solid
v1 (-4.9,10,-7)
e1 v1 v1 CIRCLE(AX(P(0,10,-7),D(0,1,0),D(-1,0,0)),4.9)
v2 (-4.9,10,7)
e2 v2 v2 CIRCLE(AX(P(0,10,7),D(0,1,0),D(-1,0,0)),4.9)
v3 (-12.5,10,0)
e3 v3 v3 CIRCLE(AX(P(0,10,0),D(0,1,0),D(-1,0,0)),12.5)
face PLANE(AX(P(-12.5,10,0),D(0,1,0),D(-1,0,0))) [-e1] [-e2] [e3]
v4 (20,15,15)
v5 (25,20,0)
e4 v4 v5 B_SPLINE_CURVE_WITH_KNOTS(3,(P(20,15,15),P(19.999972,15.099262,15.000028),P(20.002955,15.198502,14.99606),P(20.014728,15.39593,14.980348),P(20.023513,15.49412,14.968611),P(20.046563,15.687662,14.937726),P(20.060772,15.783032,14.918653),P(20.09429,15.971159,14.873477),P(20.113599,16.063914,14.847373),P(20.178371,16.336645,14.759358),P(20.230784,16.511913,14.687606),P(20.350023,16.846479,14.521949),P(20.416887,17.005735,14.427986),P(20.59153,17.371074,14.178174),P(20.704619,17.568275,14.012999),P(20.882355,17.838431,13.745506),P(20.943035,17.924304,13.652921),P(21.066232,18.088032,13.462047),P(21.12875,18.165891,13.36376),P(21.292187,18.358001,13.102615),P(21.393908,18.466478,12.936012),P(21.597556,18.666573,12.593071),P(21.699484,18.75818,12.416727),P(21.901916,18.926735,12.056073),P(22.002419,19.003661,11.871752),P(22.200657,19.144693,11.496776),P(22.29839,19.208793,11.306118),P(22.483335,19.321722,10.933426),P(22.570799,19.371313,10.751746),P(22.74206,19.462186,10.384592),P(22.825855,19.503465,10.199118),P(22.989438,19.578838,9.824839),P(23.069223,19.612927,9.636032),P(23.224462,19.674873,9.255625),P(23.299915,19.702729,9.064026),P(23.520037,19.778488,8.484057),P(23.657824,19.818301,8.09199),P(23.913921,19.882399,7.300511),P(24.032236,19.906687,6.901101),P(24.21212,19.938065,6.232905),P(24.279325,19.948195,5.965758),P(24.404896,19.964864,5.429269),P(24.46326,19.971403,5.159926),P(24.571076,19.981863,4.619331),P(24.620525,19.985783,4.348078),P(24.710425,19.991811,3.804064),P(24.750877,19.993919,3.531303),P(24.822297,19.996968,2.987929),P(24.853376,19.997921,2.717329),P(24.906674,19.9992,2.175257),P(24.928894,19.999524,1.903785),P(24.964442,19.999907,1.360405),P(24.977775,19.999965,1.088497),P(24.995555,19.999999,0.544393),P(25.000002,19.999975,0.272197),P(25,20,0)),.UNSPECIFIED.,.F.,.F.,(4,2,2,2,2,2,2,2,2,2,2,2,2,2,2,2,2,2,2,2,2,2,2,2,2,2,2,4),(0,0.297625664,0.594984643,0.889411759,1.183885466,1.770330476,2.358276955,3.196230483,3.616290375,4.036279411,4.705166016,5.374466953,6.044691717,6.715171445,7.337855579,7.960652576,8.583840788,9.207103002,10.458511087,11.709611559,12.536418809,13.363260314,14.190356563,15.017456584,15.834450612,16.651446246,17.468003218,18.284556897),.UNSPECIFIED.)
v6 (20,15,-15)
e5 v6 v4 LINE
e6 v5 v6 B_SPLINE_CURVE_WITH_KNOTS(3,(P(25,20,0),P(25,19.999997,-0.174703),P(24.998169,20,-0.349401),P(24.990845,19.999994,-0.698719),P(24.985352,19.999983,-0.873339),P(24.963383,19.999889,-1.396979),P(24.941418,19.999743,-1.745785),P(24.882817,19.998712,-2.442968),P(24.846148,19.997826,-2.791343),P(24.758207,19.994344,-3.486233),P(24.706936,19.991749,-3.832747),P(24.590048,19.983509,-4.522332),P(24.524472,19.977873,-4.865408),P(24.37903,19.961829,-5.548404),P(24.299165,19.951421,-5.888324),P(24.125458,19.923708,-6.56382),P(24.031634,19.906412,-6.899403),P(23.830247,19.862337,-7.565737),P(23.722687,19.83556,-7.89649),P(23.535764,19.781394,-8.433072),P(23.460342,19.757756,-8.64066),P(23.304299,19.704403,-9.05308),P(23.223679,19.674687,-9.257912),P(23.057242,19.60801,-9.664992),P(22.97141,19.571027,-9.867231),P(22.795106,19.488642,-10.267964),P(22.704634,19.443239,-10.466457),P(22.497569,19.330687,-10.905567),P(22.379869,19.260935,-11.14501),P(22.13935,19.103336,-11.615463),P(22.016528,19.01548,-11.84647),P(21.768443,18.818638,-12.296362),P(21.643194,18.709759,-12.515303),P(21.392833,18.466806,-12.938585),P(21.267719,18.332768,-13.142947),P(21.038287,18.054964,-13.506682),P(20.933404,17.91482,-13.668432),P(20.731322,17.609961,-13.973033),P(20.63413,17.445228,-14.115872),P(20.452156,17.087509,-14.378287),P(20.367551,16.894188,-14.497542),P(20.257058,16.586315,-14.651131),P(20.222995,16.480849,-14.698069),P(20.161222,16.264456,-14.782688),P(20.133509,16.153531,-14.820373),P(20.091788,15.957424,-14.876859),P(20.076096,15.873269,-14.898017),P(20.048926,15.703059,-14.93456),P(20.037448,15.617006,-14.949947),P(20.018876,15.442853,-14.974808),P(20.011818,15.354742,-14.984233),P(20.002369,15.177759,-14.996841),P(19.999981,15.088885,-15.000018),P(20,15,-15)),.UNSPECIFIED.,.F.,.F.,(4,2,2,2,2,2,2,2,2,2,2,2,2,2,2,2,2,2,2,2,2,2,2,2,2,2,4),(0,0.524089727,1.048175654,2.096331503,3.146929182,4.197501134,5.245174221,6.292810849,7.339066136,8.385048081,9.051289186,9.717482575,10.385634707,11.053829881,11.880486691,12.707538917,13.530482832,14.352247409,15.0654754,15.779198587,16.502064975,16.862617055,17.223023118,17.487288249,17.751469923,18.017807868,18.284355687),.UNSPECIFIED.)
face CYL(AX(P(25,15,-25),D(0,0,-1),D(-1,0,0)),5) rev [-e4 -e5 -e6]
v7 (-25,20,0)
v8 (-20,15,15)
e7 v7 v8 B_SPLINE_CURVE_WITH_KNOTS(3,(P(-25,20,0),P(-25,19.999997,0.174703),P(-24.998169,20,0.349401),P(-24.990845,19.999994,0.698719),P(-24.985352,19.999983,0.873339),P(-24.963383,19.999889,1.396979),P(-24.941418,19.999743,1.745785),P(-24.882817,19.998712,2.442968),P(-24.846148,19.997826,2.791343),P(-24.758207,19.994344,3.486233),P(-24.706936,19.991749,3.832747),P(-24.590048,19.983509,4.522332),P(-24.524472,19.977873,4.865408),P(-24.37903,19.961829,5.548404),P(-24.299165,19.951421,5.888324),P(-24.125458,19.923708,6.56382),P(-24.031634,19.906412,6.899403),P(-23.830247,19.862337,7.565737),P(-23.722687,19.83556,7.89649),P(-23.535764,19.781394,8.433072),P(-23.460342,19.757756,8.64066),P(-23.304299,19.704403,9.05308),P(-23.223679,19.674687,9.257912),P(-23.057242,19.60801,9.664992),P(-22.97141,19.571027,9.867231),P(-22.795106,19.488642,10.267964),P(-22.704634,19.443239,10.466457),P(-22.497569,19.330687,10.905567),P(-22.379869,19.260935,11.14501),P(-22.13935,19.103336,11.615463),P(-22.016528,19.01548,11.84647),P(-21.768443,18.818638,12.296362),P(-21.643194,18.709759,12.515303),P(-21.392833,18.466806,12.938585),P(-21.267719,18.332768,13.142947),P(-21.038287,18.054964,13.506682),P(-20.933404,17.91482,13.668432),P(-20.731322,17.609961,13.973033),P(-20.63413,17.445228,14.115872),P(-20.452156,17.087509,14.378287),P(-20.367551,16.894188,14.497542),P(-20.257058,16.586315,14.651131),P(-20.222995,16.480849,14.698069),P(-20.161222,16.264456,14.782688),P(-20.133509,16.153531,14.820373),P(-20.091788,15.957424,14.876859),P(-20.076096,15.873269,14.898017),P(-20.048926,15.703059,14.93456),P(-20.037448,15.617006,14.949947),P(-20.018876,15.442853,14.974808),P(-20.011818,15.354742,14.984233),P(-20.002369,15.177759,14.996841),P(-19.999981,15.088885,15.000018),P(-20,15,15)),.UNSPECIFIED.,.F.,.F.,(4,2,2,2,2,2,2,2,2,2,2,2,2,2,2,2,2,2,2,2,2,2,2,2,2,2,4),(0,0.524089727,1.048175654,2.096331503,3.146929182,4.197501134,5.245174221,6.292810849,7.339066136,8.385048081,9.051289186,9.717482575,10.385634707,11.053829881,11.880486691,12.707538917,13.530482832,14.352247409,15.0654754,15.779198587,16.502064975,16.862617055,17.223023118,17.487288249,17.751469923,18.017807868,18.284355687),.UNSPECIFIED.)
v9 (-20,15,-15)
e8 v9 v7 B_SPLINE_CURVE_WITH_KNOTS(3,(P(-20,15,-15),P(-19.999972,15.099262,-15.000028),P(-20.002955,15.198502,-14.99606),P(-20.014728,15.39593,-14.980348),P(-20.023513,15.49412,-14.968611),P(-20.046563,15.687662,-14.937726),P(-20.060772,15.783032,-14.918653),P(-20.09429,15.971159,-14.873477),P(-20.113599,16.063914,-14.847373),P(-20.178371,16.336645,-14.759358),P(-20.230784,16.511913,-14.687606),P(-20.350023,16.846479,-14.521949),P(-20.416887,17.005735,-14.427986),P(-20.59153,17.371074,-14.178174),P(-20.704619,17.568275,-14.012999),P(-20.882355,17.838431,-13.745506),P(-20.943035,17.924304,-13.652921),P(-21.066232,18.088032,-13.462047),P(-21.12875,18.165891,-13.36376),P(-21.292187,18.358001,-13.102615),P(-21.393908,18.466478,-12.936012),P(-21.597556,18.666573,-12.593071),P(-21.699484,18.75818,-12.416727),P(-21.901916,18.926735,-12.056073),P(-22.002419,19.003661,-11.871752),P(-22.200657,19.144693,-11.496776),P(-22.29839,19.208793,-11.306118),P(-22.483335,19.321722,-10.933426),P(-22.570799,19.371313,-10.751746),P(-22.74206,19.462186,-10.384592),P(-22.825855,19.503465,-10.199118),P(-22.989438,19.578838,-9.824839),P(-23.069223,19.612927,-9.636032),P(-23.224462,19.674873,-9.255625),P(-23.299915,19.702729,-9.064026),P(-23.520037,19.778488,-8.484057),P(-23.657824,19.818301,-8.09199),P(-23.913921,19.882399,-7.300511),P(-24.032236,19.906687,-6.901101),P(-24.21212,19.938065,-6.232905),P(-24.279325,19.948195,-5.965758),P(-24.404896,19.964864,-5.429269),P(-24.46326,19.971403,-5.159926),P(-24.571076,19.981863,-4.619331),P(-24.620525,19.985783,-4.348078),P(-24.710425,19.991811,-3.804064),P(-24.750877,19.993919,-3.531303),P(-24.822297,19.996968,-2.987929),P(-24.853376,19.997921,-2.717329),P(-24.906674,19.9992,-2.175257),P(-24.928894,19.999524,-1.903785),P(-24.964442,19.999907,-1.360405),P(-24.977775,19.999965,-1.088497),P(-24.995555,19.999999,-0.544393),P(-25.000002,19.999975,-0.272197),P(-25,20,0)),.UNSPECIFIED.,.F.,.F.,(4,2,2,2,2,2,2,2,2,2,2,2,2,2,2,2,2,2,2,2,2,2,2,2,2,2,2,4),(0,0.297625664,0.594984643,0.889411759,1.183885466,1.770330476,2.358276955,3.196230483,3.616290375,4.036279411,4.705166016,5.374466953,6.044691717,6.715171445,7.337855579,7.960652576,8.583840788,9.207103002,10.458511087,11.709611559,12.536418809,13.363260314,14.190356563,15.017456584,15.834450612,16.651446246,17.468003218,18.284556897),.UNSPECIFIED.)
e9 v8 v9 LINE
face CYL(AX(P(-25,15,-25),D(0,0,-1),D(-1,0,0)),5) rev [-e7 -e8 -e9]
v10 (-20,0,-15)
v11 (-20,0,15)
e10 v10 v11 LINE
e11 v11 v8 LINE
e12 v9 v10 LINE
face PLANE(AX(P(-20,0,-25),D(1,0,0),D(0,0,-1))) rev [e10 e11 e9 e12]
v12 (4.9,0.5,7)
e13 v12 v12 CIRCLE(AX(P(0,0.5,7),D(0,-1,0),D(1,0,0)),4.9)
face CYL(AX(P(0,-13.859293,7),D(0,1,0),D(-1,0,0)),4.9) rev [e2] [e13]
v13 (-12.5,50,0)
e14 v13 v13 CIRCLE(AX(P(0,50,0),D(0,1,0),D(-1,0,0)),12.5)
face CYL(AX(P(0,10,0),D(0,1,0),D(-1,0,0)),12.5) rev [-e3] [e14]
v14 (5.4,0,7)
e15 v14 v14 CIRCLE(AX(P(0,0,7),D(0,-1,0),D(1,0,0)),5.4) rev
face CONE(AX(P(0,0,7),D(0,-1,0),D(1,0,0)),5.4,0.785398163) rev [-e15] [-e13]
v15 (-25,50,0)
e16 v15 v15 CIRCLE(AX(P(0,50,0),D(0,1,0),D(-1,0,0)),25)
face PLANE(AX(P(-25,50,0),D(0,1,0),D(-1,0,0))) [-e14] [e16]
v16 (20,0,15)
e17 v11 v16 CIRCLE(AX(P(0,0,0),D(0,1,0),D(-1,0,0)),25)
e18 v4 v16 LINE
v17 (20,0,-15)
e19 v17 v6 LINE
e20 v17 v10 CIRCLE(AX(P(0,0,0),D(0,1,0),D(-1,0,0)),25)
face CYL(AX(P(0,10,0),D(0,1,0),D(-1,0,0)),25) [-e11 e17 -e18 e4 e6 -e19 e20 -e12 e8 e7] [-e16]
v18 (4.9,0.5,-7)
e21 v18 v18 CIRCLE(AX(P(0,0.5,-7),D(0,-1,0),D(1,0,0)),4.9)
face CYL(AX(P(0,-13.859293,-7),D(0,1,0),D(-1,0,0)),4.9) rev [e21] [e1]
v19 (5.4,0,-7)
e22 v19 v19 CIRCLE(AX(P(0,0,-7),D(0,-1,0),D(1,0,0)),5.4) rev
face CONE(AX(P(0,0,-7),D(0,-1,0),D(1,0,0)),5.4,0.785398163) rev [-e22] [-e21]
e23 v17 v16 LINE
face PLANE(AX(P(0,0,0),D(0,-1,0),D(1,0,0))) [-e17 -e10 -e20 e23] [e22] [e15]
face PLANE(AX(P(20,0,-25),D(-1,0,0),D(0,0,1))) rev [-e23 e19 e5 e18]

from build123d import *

# Parameters (mm, degrees)
ESBO_O2_R                  = 4.9
CORTE_EXTRUS_O1_DEPTH      = 10
CHANFRO1_SIZE              = 0.5
CORTE_EXTRUS_O2_DEPTH      = 62.23724357
CORTE_EXTRUS_O2_DEPTH_BACK = 62.23724357
ESBO_O3_W                  = 5
ESBO_O3_H                  = 20
FILETE1_R                  = 5


with BuildPart() as part:
    # Esboço1 → Revolução1 (revolve)
    with BuildSketch(Plane.XY):
        Polygon((0, 0), (-25, 0), (-25, 50), (-12.5, 50), (-12.5, 10), (0, 10), align=None)
    revolve(axis=Axis((0, 10, 0), (0, -1, 0)))

    # Esboço2 → Corte-extrusão1 (cut)
    with BuildSketch(Plane(origin=(0, 10, 0), x_dir=(1, 0, 0), z_dir=(0, 1, 0))):
        with Locations(Location((0, 7, 0), (0, 0, 180))):
            Circle(ESBO_O2_R)
        with Locations(Location((0, -7, 0), (0, 0, 180))):
            Circle(ESBO_O2_R)
    extrude(amount=-CORTE_EXTRUS_O1_DEPTH, mode=Mode.SUBTRACT)

    # Chanfro1
    chanfro1_edges = [part.edges().sort_by_distance(p)[0] for p in [
        (4.9, 0, -7),
        (4.9, 0, 7),
    ]]
    chamfer(chanfro1_edges, length=CHANFRO1_SIZE)

    # Esboço3 → Corte-extrusão2 (cut, two sides: drawn at the far end of the back side and taken through both)
    with BuildSketch(Plane.XY.offset(-CORTE_EXTRUS_O2_DEPTH_BACK)):
        with Locations((-22.5, 10)):
            Rectangle(ESBO_O3_W, ESBO_O3_H)
        with Locations((22.5, 10)):
            Rectangle(ESBO_O3_W, ESBO_O3_H)
    extrude(amount=CORTE_EXTRUS_O2_DEPTH + CORTE_EXTRUS_O2_DEPTH_BACK, mode=Mode.SUBTRACT)

    # Filete1
    filete1_edges = [part.edges().sort_by_distance(p)[0] for p in [
        (20, 20, 0),
        (-20, 20, 0),
    ]]
    fillet(filete1_edges, radius=FILETE1_R - 0.0001)  # a hair under: the kernel refuses the full size


solid = part.part
